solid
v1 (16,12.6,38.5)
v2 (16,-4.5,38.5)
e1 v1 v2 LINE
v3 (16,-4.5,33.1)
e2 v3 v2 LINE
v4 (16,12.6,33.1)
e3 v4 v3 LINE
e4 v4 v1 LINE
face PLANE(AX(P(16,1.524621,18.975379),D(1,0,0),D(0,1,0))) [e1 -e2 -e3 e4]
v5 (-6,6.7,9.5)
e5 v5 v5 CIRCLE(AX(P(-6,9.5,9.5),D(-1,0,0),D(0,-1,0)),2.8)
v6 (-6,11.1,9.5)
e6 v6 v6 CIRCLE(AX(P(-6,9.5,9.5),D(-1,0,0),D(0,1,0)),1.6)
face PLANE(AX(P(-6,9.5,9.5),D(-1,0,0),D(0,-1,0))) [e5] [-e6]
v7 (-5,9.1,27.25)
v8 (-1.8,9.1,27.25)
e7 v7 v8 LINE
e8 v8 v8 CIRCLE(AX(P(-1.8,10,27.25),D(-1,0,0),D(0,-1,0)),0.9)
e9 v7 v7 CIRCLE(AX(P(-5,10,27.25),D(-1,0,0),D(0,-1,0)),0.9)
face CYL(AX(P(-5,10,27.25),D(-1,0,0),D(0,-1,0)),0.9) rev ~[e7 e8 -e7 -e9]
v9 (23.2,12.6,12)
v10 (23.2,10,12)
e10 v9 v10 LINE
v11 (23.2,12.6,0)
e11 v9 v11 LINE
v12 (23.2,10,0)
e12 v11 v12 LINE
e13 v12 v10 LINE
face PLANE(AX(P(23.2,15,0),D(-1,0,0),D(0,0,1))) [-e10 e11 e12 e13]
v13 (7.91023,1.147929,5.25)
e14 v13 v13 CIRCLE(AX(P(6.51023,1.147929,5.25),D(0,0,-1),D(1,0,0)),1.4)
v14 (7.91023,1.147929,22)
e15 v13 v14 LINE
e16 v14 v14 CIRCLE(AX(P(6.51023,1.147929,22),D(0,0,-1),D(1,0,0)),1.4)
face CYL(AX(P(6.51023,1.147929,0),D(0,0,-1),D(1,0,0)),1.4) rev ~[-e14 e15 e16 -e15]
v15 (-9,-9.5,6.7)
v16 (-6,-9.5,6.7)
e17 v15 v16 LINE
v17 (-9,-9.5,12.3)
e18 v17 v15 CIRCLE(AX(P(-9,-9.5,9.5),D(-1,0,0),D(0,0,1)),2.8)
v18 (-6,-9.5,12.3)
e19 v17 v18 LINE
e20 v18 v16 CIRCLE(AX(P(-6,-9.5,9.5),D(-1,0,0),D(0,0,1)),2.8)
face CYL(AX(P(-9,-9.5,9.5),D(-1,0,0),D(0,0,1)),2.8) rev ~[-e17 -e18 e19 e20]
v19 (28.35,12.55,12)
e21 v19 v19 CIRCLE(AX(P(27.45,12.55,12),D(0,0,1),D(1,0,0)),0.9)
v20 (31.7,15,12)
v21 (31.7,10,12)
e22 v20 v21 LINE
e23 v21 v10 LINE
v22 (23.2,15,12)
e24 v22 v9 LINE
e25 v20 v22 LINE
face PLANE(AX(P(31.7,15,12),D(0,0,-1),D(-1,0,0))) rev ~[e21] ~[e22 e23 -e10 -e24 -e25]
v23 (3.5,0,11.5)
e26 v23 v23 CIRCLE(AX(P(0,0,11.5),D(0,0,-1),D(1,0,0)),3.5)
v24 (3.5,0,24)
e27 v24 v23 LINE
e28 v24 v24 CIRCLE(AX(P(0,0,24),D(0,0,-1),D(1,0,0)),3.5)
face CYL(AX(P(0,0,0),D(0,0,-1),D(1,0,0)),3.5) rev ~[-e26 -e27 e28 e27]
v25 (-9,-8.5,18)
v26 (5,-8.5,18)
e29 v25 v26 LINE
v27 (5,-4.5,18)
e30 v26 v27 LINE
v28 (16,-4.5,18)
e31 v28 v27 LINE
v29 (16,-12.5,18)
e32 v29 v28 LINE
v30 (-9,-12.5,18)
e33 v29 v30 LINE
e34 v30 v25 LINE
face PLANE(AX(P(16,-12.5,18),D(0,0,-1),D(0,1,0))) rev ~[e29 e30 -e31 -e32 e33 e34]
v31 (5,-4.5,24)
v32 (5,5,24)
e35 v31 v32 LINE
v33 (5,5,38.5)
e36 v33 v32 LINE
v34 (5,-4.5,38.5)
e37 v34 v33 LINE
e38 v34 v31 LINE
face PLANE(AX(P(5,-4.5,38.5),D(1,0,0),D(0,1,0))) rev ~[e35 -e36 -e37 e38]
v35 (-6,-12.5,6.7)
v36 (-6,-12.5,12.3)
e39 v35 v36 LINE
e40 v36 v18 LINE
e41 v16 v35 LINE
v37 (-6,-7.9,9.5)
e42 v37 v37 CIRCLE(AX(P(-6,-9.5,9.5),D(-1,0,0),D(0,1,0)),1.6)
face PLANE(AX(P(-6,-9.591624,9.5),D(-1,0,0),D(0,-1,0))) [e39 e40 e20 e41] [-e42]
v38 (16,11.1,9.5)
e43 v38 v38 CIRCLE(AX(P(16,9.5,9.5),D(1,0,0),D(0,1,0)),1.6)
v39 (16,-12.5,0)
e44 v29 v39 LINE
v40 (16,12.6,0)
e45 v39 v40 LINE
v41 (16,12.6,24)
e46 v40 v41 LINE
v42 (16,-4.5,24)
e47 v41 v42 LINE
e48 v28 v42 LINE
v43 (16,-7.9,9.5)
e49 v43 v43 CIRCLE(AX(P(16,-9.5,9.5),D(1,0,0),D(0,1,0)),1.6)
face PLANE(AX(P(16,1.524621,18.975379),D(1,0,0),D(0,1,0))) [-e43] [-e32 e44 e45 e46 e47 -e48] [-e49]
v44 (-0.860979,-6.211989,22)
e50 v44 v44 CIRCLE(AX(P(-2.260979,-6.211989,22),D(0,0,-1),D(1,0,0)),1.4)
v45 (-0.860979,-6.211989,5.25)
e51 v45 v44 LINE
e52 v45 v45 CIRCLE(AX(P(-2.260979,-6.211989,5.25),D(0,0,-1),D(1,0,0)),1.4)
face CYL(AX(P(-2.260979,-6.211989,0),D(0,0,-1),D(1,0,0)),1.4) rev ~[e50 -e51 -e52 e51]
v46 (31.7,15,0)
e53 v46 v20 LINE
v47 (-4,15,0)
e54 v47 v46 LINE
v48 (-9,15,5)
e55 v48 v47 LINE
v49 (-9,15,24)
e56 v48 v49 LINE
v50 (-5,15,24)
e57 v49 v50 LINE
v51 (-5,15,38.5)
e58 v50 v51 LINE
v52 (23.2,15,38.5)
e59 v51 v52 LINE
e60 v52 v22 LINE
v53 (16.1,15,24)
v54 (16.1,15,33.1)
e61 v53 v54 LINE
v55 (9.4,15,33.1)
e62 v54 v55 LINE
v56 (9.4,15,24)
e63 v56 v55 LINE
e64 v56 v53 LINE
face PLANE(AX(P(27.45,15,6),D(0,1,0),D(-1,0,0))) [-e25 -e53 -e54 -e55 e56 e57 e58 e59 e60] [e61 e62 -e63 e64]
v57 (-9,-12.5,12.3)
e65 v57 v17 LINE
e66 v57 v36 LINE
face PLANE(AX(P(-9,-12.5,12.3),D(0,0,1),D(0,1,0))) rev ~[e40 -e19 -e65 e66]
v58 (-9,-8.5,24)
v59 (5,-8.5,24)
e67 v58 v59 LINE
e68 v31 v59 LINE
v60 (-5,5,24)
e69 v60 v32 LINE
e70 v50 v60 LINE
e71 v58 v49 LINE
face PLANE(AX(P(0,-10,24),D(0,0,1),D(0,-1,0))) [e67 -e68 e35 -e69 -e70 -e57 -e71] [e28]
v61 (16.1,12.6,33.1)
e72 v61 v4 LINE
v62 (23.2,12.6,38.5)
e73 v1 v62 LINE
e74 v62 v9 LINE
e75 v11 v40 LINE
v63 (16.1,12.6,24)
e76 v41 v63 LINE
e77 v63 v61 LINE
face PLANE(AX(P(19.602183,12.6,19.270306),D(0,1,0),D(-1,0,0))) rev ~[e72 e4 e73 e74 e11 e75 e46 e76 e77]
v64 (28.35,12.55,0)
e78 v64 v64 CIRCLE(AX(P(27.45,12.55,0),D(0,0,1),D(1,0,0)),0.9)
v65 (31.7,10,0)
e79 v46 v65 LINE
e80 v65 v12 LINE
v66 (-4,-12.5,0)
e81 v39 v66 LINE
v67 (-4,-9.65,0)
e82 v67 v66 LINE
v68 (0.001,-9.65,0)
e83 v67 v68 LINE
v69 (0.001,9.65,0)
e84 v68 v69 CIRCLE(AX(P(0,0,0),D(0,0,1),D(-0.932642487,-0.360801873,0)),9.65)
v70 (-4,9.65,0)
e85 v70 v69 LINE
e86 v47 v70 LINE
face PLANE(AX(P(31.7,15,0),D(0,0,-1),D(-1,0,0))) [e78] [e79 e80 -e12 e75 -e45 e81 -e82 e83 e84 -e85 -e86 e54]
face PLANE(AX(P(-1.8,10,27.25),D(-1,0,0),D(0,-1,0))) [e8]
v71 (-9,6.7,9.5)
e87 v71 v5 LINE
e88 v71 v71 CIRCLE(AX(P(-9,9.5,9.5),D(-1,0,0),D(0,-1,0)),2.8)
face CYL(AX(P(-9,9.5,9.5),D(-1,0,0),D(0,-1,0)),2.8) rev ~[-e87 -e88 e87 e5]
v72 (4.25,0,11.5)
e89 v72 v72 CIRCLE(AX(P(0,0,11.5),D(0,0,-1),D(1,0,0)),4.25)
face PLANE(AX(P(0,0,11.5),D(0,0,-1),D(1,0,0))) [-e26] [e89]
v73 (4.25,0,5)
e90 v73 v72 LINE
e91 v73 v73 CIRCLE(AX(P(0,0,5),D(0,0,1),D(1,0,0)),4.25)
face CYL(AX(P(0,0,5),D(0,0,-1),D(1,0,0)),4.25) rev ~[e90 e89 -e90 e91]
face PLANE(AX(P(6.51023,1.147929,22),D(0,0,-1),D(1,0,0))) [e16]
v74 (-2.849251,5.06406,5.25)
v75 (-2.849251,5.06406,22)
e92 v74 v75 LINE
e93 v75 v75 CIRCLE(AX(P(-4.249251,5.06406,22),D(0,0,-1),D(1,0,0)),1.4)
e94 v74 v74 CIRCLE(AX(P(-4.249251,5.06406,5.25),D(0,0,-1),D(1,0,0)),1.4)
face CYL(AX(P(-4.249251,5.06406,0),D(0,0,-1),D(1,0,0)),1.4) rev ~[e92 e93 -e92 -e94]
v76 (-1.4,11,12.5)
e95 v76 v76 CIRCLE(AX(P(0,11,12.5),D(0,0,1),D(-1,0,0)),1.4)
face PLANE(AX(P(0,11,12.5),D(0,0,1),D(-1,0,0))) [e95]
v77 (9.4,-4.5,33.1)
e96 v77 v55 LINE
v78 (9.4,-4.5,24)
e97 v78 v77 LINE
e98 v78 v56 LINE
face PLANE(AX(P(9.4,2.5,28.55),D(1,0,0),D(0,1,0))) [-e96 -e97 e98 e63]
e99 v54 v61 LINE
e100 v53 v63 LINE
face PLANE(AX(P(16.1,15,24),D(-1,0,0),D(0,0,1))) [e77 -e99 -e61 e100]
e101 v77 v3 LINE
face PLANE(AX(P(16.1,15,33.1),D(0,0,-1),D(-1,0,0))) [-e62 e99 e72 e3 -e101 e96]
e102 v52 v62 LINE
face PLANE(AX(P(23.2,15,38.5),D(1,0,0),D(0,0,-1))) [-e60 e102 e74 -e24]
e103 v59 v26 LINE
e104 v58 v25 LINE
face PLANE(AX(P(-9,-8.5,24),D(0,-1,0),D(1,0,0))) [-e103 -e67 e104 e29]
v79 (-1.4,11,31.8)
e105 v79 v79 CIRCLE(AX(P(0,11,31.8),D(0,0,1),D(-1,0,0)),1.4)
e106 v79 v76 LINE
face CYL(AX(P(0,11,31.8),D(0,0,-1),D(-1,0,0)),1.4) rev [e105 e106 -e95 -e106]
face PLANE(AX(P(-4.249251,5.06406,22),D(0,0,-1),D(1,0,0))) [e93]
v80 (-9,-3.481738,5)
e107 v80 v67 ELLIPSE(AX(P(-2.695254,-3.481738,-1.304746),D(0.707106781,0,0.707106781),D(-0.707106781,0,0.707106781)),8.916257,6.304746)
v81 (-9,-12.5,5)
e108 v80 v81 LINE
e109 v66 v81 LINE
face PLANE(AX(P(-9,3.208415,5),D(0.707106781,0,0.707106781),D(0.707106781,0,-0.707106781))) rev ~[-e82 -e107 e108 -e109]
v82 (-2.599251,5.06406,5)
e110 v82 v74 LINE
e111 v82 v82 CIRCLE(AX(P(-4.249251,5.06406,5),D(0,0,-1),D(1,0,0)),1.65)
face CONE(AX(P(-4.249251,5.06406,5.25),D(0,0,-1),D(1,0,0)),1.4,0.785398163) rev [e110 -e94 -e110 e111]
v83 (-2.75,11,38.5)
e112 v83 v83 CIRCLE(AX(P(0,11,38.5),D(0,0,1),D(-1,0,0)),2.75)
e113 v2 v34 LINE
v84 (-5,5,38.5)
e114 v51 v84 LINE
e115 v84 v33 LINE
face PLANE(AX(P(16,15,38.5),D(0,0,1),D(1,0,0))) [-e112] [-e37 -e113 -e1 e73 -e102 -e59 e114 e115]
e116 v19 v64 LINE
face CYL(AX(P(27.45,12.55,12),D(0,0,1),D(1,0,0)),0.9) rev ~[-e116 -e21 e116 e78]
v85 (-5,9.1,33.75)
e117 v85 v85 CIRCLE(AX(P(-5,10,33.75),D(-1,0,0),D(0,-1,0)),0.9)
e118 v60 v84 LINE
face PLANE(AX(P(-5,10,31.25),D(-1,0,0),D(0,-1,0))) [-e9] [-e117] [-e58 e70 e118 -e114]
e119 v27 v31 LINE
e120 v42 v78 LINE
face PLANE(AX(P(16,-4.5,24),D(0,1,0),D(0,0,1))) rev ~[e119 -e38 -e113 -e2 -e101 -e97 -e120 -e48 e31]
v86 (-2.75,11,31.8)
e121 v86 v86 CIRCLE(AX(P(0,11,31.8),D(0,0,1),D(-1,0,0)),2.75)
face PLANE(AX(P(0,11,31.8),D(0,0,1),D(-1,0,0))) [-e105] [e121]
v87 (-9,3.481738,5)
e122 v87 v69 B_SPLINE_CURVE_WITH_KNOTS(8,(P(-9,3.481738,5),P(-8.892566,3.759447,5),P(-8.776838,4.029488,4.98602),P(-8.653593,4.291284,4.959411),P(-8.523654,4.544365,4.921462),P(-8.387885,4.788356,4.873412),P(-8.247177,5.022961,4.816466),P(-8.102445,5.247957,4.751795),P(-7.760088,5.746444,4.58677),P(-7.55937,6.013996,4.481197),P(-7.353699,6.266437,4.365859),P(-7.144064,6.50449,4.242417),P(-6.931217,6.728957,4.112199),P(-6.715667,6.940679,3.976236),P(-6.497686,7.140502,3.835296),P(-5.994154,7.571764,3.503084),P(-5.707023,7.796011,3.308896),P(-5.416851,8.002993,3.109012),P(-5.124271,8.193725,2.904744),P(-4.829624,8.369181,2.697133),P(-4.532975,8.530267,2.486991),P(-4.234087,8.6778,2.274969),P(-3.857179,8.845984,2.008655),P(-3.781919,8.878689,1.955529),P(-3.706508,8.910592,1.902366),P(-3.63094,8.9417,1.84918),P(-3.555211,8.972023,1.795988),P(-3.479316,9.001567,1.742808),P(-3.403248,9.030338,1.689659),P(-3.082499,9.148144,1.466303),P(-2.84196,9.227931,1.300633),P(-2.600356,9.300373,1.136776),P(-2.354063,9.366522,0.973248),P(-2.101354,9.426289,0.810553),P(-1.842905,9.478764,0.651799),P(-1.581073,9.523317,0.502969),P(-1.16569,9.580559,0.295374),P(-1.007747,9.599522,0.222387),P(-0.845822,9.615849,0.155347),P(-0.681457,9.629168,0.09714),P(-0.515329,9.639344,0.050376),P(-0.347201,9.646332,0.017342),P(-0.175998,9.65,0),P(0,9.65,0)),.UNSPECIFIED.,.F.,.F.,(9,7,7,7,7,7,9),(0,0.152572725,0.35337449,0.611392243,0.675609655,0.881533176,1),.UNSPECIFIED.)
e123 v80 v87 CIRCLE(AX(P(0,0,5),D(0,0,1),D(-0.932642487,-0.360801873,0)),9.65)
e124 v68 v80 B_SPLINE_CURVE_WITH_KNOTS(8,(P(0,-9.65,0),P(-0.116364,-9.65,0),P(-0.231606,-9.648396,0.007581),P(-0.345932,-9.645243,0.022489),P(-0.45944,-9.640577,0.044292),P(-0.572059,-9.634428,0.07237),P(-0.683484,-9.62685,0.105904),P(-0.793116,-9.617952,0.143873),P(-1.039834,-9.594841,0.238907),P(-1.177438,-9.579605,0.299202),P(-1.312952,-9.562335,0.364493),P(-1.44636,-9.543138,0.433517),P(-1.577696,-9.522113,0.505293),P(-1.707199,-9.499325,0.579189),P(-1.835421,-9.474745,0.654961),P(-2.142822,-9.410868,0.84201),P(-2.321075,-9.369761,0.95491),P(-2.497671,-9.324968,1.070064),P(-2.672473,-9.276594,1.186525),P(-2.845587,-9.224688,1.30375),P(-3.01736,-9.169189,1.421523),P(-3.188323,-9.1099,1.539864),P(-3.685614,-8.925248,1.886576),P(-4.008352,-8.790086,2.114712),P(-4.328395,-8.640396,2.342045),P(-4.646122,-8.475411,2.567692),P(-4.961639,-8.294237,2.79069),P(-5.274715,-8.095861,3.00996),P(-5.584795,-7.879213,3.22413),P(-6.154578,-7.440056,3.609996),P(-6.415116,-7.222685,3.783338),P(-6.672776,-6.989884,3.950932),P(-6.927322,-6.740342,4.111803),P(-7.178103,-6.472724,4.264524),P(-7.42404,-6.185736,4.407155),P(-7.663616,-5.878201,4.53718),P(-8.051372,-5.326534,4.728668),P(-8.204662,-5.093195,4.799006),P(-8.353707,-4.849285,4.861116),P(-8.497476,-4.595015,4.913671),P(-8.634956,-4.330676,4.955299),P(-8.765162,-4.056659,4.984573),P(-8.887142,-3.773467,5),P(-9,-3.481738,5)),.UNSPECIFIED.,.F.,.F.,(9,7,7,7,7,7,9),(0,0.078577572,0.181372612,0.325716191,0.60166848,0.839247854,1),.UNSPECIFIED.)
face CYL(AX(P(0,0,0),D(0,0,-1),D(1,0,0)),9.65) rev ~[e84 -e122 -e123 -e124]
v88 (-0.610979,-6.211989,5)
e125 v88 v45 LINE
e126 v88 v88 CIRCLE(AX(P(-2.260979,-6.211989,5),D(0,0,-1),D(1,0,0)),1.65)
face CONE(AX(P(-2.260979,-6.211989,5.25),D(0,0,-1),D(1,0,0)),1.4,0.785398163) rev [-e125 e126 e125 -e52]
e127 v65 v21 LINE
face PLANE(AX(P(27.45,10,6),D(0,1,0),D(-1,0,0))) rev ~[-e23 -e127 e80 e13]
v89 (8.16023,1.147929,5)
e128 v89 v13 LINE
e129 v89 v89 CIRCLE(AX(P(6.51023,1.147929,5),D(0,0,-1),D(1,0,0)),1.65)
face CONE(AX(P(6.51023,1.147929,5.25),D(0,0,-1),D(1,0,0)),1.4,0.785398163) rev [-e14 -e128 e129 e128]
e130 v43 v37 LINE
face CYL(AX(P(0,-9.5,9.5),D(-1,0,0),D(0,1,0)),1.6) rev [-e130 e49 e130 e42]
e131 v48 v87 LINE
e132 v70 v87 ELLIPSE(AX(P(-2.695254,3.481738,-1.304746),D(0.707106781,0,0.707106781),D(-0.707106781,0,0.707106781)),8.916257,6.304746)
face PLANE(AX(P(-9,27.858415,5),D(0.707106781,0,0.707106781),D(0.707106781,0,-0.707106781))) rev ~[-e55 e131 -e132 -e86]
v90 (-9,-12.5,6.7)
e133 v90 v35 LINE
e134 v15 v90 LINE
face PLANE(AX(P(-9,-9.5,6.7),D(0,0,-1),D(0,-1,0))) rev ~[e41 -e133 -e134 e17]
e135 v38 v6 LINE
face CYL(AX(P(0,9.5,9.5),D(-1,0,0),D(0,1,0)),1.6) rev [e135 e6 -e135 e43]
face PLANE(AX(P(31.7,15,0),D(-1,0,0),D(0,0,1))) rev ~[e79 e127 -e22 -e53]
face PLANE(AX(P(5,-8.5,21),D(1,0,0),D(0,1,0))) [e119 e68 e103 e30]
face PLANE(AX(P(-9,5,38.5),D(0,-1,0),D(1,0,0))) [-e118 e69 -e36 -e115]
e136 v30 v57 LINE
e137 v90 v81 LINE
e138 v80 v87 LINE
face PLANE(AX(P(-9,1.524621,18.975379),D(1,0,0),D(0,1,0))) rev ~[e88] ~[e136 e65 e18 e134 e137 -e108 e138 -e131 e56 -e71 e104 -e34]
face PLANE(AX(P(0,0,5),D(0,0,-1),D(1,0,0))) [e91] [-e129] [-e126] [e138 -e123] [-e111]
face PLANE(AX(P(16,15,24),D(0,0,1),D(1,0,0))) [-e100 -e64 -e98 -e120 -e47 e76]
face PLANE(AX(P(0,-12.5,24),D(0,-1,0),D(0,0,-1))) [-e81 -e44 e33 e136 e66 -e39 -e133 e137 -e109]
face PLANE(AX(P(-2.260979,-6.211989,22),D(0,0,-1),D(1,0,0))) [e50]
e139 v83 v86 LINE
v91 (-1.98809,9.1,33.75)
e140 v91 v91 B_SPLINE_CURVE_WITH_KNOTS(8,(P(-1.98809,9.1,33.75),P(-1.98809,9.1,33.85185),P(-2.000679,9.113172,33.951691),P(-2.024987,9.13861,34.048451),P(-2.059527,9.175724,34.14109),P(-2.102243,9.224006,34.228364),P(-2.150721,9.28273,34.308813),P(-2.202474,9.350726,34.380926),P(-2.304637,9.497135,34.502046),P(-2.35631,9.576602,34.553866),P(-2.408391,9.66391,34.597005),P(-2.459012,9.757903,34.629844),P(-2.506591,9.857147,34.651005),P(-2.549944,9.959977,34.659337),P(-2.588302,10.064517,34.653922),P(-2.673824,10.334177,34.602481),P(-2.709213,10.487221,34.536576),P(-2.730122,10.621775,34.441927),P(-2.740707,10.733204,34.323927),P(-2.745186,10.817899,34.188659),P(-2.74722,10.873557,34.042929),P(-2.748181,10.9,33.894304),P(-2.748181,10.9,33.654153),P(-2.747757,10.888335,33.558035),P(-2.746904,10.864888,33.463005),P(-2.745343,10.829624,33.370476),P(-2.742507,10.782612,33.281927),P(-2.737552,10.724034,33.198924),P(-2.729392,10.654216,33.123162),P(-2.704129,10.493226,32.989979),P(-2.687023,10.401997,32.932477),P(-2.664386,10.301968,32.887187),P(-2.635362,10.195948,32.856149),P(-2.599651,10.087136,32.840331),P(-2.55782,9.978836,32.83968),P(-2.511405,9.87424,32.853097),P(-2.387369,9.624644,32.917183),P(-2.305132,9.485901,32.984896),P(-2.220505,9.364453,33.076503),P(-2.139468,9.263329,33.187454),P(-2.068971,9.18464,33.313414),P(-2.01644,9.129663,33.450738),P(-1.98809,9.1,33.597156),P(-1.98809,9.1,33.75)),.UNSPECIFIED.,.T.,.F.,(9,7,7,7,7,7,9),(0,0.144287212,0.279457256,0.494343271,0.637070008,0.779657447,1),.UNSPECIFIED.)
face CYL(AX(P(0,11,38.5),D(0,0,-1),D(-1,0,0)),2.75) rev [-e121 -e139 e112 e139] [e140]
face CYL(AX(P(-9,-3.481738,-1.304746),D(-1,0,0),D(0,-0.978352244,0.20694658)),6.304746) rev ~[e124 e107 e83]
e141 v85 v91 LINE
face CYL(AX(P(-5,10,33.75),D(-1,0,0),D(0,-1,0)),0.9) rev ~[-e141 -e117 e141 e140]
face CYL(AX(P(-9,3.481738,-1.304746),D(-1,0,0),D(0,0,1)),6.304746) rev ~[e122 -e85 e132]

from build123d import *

# Parameters (mm, degrees)
F0_R          = 1.6
F1_DEPTH      = 16
F1_DEPTH_BACK = 9
F3_R          = 3.5
F3_R_2        = 1.4
F4_DEPTH      = 22
F5_DEPTH      = 16.501
F8_R          = 9.65
F9_DEPTH      = 5
F10_R         = 4.25
F11_DEPTH     = 6.5
F12_W         = 25
F12_H         = 9.1
F13_DEPTH     = 6.6
F14_R         = 2.8
F15_DEPTH     = 3
F16_W         = 8
F16_H         = 6
F16_H_2       = 9.1
F17_DEPTH     = 11
F23_W         = 8
F23_H         = 14.5
F24_DEPTH     = 25.001
F25_W         = 14
F25_H         = 9.5
F26_DEPTH     = 14.5
F28_DEPTH     = 9.0010001359
F29_W         = 14
F29_H         = 4
F30_DEPTH     = 6
F32_DEPTH     = 2.4
F33_W         = 10
F33_H         = 14.5
F34_DEPTH     = 4
F35_R         = 0.9
F36_DEPTH     = 3.2
F37_W         = 8.5
F37_H         = 12
F38_DEPTH     = 5
F39_R         = 0.9
F40_DEPTH     = 12
F41_SIZE      = 0.25
F42_T1_DEPTH  = 31.0668298797
F42_T3_DEPTH  = 28.5668298797


# Not quite as in the source:
# - a fillet or chamfer that OpenCascade refuses, or shapes differently, is made with other operations: its cross-section is extruded or revolved along the edge and cut away or added


with BuildPart() as f1:
    # F0 (on Right) → F1 (new body, two sides)
    with BuildSketch(Plane.YZ) as f1_sk:
        Polygon((-12.5, 0), (15, 0), (15, 38.5), (-10, 38.5), (-10, 24), (-12.5, 24), align=None)
        with Locations((-9.5, 9.5)):
            Circle(F0_R, mode=Mode.SUBTRACT)
        with Locations((9.5, 9.5)):
            Circle(F0_R, mode=Mode.SUBTRACT)
    extrude(amount=F1_DEPTH)
    extrude(f1_sk.sketch, amount=-F1_DEPTH_BACK)

    # F3 (on face) → F4 (cut)
    with BuildSketch(Plane(origin=(0, 0, 0), x_dir=(1, 0, 0), z_dir=(0, 0, -1))):
        Circle(F3_R)
        with Locations((-2.2609790798, 6.2119889676)):
            Circle(F3_R_2)
        with Locations((-4.2492507141, -5.0640598044)):
            Circle(F3_R_2)
        with Locations((6.5102297939, -1.1479291633)):
            Circle(F3_R_2)
    extrude(amount=-F4_DEPTH, mode=Mode.SUBTRACT)

    # F5 (cut, through all): a face of the model
    f5_faces = [f1.faces().sort_by_distance(p)[0] for p in [
        (0, 0, 22),
    ]]
    extrude(f5_faces, amount=-F5_DEPTH, mode=Mode.SUBTRACT)

    # F8 (on face) → F9 (cut)
    with BuildSketch(Plane(origin=(0, 0, 0), x_dir=(1, 0, 0), z_dir=(0, 0, -1))):
        Circle(F8_R)
    extrude(amount=-F9_DEPTH, mode=Mode.SUBTRACT)

    # F10 (on face) → F11 (cut)
    with BuildSketch(Plane(origin=(0, 0, 5), x_dir=(1, 0, 0), z_dir=(0, 0, -1))):
        Circle(F10_R)
    extrude(amount=-F11_DEPTH, mode=Mode.SUBTRACT)

    # F12 (on face) → F13 (cut)
    with BuildSketch(Plane.YZ.offset(16)):
        with Locations((2.5, 28.55)):
            Rectangle(F12_W, F12_H)
    extrude(amount=-F13_DEPTH, mode=Mode.SUBTRACT)

    # F14 (on face) → F15 (cut)
    with BuildSketch(Plane(origin=(-9, 0, 0), x_dir=(0, -1, 0), z_dir=(-1, 0, 0))):
        with Locations((-9.5, 9.5)):
            Circle(F14_R)
        with BuildLine():
            ThreePointArc((9.5, 6.7), (11.4798989873, 7.5201010127), (12.3, 9.5))
            ThreePointArc((12.3, 9.5), (11.4798989873, 11.4798989873), (9.5, 12.3))
            ThreePointArc((9.5, 12.3), (6.7, 9.5), (9.5, 6.7))
        make_face()
        with BuildLine():
            ThreePointArc((9.5, 12.3), (11.4798989873, 11.4798989873), (12.3, 9.5))
            ThreePointArc((12.3, 9.5), (11.4798989873, 7.5201010127), (9.5, 6.7))
            Line((9.5, 6.7), (12.5, 6.7))
            Line((12.5, 6.7), (12.5, 12.3))
            Line((12.5, 12.3), (9.5, 12.3))
        make_face()
    extrude(amount=-F15_DEPTH, mode=Mode.SUBTRACT)

    # F16 (on face) → F17 (cut)
    with BuildSketch(Plane.YZ.offset(16)):
        with Locations((-8.5, 21)):
            Rectangle(F16_W, F16_H)
        with Locations((-8.5, 28.55)):
            Rectangle(F16_W, F16_H_2)
    extrude(amount=-F17_DEPTH, mode=Mode.SUBTRACT)

    # F21 (on plane+point) → F22 (revolve, cut)
    with BuildSketch(Plane.XZ.offset(-11)):
        Polygon((0, 12.5), (0, 38.5), (-2.75, 38.5), (-2.75, 31.8), (-1.4, 31.8), (-1.4, 12.5), align=None)
    revolve(axis=Axis((0, 11, 25.5), (0, 0, 1)), mode=Mode.SUBTRACT)

    # F23 (on face) → F24 (cut, through all)
    with BuildSketch(Plane.YZ.offset(16)):
        with Locations((-8.5, 31.25)):
            Rectangle(F23_W, F23_H)
    extrude(amount=-F24_DEPTH, mode=Mode.SUBTRACT)

    # F25 (on face) → F26 (cut, through all)
    with BuildSketch(Plane.XY.offset(38.5)):
        with Locations((-2, 0.25)):
            Rectangle(F25_W, F25_H)
    extrude(amount=-F26_DEPTH, mode=Mode.SUBTRACT)

    # F27 (on face) → F28 (cut, through all)
    with BuildSketch(Plane(origin=(-9, 0, 0), x_dir=(0, -1, 0), z_dir=(-1, 0, 0))):
        with BuildLine():
            Line((-9.65, 0), (9.65, 0))
            ThreePointArc((9.65, 0), (7.4518594557, 3.5930041952), (3.4817380717, 5))
            Line((3.4817380717, 5), (-3.4817380717, 5))
            ThreePointArc((-3.4817380717, 5), (-7.4518594557, 3.5930041952), (-9.65, 0))
        make_face()
    extrude(amount=-F28_DEPTH, mode=Mode.SUBTRACT)

    # F29 (on face) → F30 (cut, through all)
    with BuildSketch(Plane.XY.offset(24)):
        with Locations((-2, -10.5)):
            Rectangle(F29_W, F29_H)
    extrude(amount=-F30_DEPTH, mode=Mode.SUBTRACT)

    # F31 (on face) → F32 (join)
    with BuildSketch(Plane(origin=(0, 15, 0), x_dir=(-1, 0, 0), z_dir=(0, 1, 0))):
        Polygon((-23.2, 0), (-16, 0), (-16, 24), (-16.1, 24), (-16.1, 33.1), (-16, 33.1), (-16, 38.5), (-23.2, 38.5), align=None)
    extrude(amount=-F32_DEPTH)

    # F33 (on face) → F34 (cut)
    with BuildSketch(Plane(origin=(-9, 0, 0), x_dir=(0, -1, 0), z_dir=(-1, 0, 0))):
        with Locations((-10, 31.25)):
            Rectangle(F33_W, F33_H)
    extrude(amount=-F34_DEPTH, mode=Mode.SUBTRACT)

    # F35 (on face) → F36 (cut)
    with BuildSketch(Plane(origin=(-5, 0, 0), x_dir=(0, -1, 0), z_dir=(-1, 0, 0))):
        with Locations((-10, 33.75)):
            Circle(F35_R)
        with Locations((-10, 27.25)):
            Circle(F35_R)
    extrude(amount=-F36_DEPTH, mode=Mode.SUBTRACT)

    # F37 (on face) → F38 (join)
    with BuildSketch(Plane(origin=(0, 15, 0), x_dir=(-1, 0, 0), z_dir=(0, 1, 0))):
        with Locations((-27.45, 6)):
            Rectangle(F37_W, F37_H)
    extrude(amount=-F38_DEPTH)

    # F39 (on face) → F40 (cut, through all)
    with BuildSketch(Plane.XY.offset(12)):
        with Locations((27.45, 12.55)):
            Circle(F39_R)
    extrude(amount=-F40_DEPTH, mode=Mode.SUBTRACT)

    # F41
    f41_edges = [f1.edges().sort_by_distance(p)[0] for p in [
        (-3.660979, -6.211989, 5),
        (5.11023, 1.147929, 5),
        (-5.649251, 5.06406, 5),
    ]]
    chamfer(f41_edges, length=F41_SIZE)

    # F42: chamfer of 5 on 2 edges, made by hand

    # F42_s2 → F42_t1 (cut)
    with BuildSketch(Plane.XZ.offset(-27.8584149398)):
        Polygon((-9, 5), (-4, 0), (-9, 0), align=None)
    extrude(amount=F42_T1_DEPTH, mode=Mode.SUBTRACT)

    # F42_s4 → F42_t3 (cut)
    with BuildSketch(Plane.XZ.offset(-3.2084149398)):
        Polygon((-9, 5), (-4, 0), (-9, 0), align=None)
    extrude(amount=F42_T3_DEPTH, mode=Mode.SUBTRACT)


solid = f1.part
